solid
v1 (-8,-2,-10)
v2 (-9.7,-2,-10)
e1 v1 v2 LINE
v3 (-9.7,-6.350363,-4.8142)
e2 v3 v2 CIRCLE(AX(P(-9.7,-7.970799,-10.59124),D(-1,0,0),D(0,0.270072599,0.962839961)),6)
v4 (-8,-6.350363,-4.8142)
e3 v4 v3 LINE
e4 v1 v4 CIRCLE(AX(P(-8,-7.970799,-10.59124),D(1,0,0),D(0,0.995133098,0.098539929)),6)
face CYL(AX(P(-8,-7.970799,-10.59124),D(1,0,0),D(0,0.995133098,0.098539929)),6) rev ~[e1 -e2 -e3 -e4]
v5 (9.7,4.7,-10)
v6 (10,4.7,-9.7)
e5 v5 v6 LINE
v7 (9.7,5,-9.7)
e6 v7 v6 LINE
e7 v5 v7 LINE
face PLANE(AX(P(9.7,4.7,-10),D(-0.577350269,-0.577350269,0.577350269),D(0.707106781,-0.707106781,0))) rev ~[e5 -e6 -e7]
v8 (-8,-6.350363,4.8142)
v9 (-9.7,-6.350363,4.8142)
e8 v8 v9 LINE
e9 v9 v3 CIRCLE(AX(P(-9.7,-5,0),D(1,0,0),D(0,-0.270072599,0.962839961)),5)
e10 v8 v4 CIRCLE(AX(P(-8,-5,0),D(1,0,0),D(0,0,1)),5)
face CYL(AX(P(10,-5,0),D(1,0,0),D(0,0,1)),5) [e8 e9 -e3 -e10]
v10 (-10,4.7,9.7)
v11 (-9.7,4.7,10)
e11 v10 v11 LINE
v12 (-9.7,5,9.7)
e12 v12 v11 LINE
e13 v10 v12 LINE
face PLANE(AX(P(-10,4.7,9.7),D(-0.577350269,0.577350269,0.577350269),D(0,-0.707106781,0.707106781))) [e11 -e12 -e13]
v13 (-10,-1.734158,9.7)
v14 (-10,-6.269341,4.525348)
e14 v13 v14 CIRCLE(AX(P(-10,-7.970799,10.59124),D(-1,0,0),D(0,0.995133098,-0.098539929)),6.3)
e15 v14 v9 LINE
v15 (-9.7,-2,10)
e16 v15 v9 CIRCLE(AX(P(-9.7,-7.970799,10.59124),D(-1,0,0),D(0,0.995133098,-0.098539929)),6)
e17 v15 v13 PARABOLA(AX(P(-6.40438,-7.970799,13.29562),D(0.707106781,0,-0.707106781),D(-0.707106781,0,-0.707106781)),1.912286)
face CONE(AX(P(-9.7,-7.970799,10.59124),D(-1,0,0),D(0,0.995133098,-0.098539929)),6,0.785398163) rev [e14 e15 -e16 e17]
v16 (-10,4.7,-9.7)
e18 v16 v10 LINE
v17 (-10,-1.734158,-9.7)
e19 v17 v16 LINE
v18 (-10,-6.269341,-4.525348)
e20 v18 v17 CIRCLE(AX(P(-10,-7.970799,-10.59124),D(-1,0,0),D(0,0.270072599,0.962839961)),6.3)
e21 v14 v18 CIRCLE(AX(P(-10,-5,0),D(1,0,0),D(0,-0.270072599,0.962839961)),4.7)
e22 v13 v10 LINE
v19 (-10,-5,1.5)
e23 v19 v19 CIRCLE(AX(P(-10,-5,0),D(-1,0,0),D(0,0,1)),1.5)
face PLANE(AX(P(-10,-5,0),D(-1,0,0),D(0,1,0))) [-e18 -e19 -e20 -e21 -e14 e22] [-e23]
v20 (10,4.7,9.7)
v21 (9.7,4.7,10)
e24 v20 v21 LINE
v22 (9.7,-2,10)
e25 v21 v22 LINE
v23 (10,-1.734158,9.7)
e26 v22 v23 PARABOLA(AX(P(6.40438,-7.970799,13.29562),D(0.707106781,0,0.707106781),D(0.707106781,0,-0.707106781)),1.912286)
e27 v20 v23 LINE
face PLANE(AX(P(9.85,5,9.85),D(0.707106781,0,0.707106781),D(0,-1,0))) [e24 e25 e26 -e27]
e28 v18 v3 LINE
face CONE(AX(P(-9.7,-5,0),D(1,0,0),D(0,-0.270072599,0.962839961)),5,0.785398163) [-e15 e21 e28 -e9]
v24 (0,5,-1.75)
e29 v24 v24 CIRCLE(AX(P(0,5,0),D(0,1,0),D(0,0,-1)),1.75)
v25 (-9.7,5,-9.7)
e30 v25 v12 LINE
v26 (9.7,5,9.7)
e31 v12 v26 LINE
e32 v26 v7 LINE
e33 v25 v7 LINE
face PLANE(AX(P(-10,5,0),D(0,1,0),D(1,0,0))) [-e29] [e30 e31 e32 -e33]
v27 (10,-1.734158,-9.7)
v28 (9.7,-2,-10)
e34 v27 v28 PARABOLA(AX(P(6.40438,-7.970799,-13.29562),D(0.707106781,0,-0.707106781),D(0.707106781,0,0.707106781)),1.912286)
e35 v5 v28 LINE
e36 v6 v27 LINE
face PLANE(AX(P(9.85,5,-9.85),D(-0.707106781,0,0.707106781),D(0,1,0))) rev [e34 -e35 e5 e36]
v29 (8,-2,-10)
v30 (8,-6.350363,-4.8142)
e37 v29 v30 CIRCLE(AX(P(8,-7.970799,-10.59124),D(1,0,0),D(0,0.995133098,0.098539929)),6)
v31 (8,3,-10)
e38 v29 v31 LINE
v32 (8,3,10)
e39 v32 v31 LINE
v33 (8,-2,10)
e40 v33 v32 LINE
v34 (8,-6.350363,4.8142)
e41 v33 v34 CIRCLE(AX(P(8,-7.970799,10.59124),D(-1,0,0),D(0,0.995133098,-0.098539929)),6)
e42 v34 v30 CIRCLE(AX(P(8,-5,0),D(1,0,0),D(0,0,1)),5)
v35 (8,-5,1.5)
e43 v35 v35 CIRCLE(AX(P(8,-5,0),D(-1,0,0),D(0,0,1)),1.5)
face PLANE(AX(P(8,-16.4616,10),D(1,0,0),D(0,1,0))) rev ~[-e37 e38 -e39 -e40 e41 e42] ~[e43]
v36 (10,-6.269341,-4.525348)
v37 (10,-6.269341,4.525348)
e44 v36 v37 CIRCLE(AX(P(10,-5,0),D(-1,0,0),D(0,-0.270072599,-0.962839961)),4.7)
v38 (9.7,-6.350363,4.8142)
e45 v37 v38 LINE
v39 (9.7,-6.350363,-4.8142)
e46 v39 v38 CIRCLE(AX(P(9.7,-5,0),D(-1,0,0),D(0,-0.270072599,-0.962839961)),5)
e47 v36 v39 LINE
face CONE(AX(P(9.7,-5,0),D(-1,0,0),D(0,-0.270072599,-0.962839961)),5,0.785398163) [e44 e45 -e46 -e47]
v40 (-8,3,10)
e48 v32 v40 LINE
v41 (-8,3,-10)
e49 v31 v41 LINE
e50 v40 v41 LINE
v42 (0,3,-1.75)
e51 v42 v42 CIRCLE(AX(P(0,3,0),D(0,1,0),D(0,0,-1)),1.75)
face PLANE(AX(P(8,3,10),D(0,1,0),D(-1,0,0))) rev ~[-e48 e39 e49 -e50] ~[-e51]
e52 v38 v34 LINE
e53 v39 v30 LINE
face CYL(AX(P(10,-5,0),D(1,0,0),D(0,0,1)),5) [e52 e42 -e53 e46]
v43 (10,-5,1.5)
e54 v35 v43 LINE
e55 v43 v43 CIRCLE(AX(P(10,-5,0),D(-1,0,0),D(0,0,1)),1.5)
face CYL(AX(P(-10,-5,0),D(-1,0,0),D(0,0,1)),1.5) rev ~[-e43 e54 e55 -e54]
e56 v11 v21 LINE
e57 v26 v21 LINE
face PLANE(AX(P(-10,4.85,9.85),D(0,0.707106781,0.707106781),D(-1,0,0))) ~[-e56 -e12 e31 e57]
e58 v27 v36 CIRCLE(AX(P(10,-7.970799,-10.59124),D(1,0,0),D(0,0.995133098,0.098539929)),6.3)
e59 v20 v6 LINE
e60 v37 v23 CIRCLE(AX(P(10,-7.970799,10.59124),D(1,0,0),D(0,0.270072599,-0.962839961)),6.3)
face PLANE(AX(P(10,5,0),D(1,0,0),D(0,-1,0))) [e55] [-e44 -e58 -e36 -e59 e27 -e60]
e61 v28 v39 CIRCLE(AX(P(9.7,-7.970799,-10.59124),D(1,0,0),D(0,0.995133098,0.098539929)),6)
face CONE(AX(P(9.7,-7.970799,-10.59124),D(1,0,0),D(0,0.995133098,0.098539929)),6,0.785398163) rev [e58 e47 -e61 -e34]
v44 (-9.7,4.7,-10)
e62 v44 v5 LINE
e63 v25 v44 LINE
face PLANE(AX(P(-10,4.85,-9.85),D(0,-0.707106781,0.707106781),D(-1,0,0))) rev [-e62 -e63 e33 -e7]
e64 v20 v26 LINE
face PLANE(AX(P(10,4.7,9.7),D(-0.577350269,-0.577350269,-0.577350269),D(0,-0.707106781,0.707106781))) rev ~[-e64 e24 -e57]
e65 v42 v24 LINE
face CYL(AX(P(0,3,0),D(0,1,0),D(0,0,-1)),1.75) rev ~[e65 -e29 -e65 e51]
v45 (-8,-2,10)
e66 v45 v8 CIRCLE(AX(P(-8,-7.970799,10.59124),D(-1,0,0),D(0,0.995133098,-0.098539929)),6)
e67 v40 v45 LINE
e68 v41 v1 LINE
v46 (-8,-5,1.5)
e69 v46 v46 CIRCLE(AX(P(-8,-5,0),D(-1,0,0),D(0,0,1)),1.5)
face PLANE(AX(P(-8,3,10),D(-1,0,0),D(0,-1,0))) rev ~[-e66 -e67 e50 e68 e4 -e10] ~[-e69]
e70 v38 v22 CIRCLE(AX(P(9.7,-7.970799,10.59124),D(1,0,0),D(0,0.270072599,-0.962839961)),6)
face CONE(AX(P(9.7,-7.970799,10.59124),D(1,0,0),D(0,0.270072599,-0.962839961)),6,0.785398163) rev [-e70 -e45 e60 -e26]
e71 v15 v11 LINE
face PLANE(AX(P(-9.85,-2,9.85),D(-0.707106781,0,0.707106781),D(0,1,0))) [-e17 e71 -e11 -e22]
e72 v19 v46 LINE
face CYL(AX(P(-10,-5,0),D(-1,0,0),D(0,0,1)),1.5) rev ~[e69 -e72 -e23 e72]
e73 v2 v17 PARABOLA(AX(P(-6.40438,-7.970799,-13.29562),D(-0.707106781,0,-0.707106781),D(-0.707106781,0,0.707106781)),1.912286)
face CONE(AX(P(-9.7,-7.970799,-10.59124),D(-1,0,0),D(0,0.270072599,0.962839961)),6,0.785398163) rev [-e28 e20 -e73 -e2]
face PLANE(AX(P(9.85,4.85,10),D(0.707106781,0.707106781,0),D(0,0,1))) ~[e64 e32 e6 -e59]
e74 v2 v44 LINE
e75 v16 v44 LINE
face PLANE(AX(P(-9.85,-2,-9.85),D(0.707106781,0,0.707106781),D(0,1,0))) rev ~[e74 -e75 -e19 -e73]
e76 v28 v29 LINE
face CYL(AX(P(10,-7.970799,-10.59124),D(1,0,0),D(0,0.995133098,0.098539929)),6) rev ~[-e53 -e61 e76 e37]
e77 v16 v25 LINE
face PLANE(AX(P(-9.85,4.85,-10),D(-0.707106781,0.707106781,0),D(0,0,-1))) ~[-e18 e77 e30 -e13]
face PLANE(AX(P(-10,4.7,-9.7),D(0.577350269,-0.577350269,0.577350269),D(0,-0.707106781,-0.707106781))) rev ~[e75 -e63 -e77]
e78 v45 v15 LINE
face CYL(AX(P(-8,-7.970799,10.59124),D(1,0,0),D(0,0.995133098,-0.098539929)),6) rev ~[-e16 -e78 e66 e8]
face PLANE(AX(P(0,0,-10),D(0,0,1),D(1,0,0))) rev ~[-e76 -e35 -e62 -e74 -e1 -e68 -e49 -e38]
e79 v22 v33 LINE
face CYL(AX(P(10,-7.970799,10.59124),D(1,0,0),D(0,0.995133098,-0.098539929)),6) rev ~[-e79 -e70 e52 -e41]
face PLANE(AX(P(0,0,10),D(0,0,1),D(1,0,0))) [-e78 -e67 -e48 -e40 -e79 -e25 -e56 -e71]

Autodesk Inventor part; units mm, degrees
ref_plane "YZ Plane" through (0, 0, 0) normal (1, 0, 0) x (0, 1, 0)
ref_plane "XZ Plane" through (0, 0, 0) normal (0, 1, 0) x (-1, 0, 0)
ref_plane "XY Plane" through (0, 0, 0) normal (0, 0, 1) x (1, 0, 0)
sketch "Sketch1" plane through (0, 0, 0) normal (0, 0, 1) x (1, 0, 0)
  line L0 (-10, 5) -> (10, 5)
  line L1 (10, 5) -> (10, -5)
  line L2 (10, -5) -> (-10, -5)
  line L3 (-10, -5) -> (-10, 5)
  line L4 (-10, 5) -> (10, -5) construction
  line L5 (10, 5) -> (-10, -5) construction
  point P0 (0, 0)
extrude "Extrusion1" add sketch "Sketch1" along normal mid plane 20
sketch "Sketch3" plane through (10, -5, 10) normal (1, 0, 0) x (0, 0, -1)
  point P0 (10, 5)
sketch "Sketch4" plane through (10, -5, 10) normal (1, 0, 0) x (0, 0, -1)
  line L0 (0, 0) -> (20, 0) projected
  arc A0 (5, 0) -> (15, 0) centre (10, 0) ccw
  point P0 (10, 5)
  dimension "d9" = 10
extrude "Extrusion3" add sketch "Sketch4" against normal up to surface (20 mm away)
sketch "Sketch2" plane through (0, 0, 10) normal (0, 0, 1) x (1, 0, 0)
  line L0 (-8, -16.4616) -> (8, -16.4616)
  line L1 (8, -16.4616) -> (8, 3)
  line L2 (8, 3) -> (-8, 3)
  line L3 (-8, 3) -> (-8, -16.4616)
  line L4 (-10, 5) -> (-10, -5) projected
  line L5 (10, -5) -> (10, 5) projected
  line L6 (10, 5) -> (-10, 5) projected
  point P0 (0, 0)
  dimension "d4" = 2
  dimension "d5" = 2
  dimension "d6" = 2
extrude "Extrusion2" cut sketch "Sketch2" against normal blind 30
sketch "Sketch5" plane through (10, -5, 10) normal (1, 0, 0) x (0, 0, -1)
  line L0 (0, 8) -> (0, 0) projected
  line L1 (5, 0) -> (0, 0) projected
  line L2 (0, 3) -> (5, 3)
  line L3 (5, 3) -> (5, 0)
  line L4 (5, 0) -> (0, 0)
  line L5 (0, 0) -> (0, 3)
  arc A0 (5, 0) -> (15, 0) centre (10, 0) ccw projected
  line L6 (20, 10) -> (20, 0) projected
  line L7 (15, 0) -> (20, 0)
  line L8 (20, 0) -> (20, 3)
  line L9 (20, 3) -> (15, 3)
  line L10 (15, 3) -> (15, 0)
  point P0 (10, 5)
  dimension "d12" = 3
extrude "Extrusion4" cut sketch "Sketch5" against normal blind 30
fillet "Fillet1" radius 6 4 edges at (9, -2, 5) (9, -2, -5) (-9, -2, 5) (-9, -2, -5)
chamfer "Chamfer1" distance 0.3 angle 45 12 edges at (0, 5, 10) (10, 5, 0) (0, 5, -10) (-10, 5, 0) (-10, 1.5, 10) (10, 1.5, 10) (10, 1.5, -10) (-10, 1.5, -10) (-10, -3.3741, 6.7351) (10, -3.3741, -6.7351) (10, -10, 0) (10, -3.3741, 6.7351)
sketch "Sketch6" plane through (-10, -4.2, -14.7) normal (-1, 0, 0) x (0, 0, 1)
  arc A0 (9.8858, -2.1504) -> (19.5142, -2.1504) centre (14.7, -0.8) ccw projected
  circle A1 centre (14.7, -0.8) radius 1.5
  point P0 (14.7, 4.2)
  dimension "d20" = 3
extrude "Extrusion5" cut sketch "Sketch6" against normal blind 30
sketch "Sketch7" plane through (-8, 3, 10) normal (0, -1, 0) x (1, 0, 0)
  point P0 (8, -10)
  point P1 (8, -10)
hole "Hole1" at (0, 3, 0) direction (0, 1, 0) diameter 3.5 depth 11.8 tip angle 118
properties part number "Ball Track Mounting Plate" material "Brass, Soft Yellow"
